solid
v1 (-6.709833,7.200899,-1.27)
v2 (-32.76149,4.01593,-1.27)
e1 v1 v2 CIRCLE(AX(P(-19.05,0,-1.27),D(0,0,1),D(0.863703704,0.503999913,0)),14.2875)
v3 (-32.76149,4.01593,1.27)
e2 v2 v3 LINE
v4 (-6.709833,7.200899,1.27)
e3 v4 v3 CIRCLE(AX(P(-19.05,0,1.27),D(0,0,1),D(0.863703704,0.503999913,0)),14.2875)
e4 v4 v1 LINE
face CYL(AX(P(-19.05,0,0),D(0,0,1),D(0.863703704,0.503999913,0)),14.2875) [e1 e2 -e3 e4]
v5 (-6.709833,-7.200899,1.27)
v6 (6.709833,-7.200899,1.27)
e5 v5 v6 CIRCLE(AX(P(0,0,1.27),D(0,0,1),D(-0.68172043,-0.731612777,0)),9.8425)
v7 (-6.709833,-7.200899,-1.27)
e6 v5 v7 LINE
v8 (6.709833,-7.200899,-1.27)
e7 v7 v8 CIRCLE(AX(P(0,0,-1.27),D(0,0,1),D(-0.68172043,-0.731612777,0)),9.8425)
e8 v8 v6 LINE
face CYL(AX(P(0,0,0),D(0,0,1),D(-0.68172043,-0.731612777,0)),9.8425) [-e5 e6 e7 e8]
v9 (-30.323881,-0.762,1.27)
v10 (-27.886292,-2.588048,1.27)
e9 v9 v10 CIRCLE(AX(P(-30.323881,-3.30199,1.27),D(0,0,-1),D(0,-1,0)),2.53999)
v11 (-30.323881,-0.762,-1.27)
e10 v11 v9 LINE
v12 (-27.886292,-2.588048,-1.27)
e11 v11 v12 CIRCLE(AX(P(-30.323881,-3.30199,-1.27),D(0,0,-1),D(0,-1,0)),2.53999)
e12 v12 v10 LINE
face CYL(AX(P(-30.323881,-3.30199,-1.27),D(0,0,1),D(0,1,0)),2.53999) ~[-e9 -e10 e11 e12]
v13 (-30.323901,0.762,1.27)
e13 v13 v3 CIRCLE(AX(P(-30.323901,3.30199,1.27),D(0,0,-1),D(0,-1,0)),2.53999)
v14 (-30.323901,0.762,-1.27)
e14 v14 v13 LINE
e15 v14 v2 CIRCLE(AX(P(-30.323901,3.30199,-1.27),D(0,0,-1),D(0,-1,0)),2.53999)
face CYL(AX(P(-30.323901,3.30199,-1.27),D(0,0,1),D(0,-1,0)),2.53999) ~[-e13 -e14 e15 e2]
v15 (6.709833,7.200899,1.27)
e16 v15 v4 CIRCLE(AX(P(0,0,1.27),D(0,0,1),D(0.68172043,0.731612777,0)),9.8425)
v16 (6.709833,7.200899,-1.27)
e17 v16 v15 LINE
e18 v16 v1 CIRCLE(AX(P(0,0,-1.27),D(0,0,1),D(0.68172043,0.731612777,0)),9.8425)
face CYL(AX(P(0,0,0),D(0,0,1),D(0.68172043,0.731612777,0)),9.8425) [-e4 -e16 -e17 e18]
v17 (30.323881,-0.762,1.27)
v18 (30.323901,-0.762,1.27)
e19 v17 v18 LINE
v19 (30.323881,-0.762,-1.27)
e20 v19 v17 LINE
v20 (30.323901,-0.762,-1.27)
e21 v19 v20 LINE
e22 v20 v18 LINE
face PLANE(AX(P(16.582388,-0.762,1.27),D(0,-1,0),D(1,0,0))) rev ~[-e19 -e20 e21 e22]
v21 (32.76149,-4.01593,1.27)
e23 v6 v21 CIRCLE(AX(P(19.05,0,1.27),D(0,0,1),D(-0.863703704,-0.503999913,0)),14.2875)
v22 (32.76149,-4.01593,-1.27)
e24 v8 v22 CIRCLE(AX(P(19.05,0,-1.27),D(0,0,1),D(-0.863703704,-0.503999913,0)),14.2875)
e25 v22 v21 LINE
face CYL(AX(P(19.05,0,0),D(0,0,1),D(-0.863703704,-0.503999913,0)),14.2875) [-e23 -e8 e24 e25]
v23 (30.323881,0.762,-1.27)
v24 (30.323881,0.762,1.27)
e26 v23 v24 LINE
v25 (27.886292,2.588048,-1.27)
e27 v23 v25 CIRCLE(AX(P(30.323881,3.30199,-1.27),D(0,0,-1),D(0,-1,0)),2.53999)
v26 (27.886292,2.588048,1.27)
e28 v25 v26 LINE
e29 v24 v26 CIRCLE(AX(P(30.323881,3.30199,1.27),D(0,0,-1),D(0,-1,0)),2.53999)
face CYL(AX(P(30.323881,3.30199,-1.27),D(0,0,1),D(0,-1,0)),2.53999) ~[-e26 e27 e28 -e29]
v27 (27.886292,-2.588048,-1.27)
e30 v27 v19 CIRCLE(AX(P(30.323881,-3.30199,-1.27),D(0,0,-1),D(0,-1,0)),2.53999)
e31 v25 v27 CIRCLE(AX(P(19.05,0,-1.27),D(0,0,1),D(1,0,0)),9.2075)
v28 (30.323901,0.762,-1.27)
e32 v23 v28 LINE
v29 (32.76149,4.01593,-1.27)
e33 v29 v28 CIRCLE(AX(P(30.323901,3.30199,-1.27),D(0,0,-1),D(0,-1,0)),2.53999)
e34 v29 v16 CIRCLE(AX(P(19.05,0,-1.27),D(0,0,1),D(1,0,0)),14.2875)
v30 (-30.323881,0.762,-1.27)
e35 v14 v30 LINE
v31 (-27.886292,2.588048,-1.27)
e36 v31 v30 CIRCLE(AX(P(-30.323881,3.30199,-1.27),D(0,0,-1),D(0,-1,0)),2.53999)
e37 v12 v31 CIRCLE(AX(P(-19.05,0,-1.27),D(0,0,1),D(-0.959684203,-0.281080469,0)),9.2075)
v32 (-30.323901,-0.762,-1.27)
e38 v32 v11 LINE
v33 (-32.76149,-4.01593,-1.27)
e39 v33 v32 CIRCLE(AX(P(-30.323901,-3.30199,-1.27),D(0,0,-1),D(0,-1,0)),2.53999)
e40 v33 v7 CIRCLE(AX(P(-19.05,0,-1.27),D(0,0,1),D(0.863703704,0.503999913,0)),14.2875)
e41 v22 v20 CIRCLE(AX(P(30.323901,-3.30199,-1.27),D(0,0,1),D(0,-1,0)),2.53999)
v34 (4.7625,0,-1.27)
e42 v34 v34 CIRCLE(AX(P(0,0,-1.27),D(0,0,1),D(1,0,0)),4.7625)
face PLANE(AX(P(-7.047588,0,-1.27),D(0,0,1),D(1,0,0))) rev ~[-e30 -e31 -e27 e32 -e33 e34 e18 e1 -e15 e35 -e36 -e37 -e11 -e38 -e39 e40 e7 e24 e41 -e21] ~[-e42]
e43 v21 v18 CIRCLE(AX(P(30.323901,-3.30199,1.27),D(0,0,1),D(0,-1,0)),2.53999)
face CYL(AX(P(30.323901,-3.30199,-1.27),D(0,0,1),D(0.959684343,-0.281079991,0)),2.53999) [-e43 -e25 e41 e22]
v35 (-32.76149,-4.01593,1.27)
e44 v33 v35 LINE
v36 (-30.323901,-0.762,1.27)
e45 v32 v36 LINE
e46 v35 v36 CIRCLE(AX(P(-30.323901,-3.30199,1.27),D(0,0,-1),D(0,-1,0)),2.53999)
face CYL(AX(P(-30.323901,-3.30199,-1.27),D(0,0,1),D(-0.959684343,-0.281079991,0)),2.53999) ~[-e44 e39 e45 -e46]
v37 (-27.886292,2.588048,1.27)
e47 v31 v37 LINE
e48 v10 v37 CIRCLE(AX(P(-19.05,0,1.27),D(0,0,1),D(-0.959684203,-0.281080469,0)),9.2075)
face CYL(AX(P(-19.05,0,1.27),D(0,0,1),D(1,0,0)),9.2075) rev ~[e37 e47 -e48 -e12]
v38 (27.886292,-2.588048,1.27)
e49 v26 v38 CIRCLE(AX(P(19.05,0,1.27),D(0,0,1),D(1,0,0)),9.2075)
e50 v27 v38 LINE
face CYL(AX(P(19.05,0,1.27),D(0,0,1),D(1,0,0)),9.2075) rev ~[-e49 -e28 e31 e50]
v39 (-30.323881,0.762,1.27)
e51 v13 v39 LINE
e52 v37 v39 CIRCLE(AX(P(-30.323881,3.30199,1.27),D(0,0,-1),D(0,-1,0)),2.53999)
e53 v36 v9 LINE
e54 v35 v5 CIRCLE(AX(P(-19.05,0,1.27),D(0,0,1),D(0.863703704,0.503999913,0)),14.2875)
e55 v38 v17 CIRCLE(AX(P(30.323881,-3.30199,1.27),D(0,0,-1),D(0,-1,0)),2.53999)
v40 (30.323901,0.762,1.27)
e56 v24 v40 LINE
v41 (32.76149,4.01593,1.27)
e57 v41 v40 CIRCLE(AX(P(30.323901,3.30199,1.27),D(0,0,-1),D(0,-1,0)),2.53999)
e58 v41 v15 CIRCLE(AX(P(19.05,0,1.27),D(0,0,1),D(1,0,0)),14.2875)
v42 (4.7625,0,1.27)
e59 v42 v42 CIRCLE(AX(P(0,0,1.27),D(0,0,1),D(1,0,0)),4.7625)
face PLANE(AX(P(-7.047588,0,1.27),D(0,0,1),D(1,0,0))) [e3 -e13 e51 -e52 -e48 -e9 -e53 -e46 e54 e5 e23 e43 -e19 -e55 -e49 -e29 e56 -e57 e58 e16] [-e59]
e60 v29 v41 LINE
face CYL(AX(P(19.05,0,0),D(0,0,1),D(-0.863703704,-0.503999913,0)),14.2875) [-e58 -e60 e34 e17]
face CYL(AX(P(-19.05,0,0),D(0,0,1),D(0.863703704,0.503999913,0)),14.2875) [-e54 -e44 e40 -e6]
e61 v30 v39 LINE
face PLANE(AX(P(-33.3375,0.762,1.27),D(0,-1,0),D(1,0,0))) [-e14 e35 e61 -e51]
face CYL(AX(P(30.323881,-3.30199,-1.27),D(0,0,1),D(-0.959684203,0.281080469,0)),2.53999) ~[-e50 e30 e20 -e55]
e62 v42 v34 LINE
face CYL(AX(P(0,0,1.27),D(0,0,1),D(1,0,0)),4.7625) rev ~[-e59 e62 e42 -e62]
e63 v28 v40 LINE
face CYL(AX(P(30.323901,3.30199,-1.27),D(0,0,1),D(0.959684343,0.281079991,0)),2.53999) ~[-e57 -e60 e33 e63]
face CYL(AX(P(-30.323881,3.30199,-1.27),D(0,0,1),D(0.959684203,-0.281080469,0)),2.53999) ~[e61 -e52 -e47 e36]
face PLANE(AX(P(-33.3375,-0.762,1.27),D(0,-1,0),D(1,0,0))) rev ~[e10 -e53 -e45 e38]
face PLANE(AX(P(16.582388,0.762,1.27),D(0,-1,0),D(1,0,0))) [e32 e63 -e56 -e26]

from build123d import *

# Parameters (mm, degrees)
F1_DEPTH = 1.27
F2_R     = 9.2075
F2_R_2   = 4.7625
F3_DEPTH = 25.4
F4_W     = 16.7551115155
F4_H     = 1.524
F5_DEPTH = 25.4
F6_R     = 2.53999


# Not quite as in the source:
# - a fillet or chamfer is up to 0.001 mm smaller than in the source, because OpenCascade refuses the exact size


with BuildPart() as f1:
    # F0 (on Top) → F1 (new body, symmetric)
    with BuildSketch(Plane.XY):
        with BuildLine():
            ThreePointArc((-6.7098333333, -7.2008987556), (-5.2579227906, -3.7297804895), (-4.7625, 0))
            ThreePointArc((-4.7625, 0), (-5.2579227906, 3.7297804895), (-6.7098333333, 7.2008987556))
            ThreePointArc((-6.7098333333, 7.2008987556), (-9.8425, 0), (-6.7098333333, -7.2008987556))
        make_face()
        with BuildLine():
            ThreePointArc((-6.7098333333, 7.2008987556), (-5.2579227906, 3.7297804895), (-4.7625, 0))
            ThreePointArc((-4.7625, 0), (-5.2579227906, -3.7297804895), (-6.7098333333, -7.2008987556))
            ThreePointArc((-6.7098333333, -7.2008987556), (0, -9.8425), (6.7098333333, -7.2008987556))
            ThreePointArc((6.7098333333, -7.2008987556), (4.7625, 0), (6.7098333333, 7.2008987556))
            ThreePointArc((6.7098333333, 7.2008987556), (0, 9.8425), (-6.7098333333, 7.2008987556))
        make_face()
        with BuildLine():
            ThreePointArc((-6.7098333333, -7.2008987556), (-9.8425, 0), (-6.7098333333, 7.2008987556))
            ThreePointArc((-6.7098333333, 7.2008987556), (-33.3375, 0), (-6.7098333333, -7.2008987556))
        make_face()
        with BuildLine():
            ThreePointArc((9.8425, 0), (9.0254180189, 3.9264024034), (6.7098333333, 7.2008987556))
            ThreePointArc((6.7098333333, 7.2008987556), (4.7625, 0), (6.7098333333, -7.2008987556))
            ThreePointArc((6.7098333333, -7.2008987556), (9.0254180189, -3.9264024034), (9.8425, 0))
        make_face()
        with BuildLine():
            ThreePointArc((33.3375, 0), (22.7797804895, 13.7920772094), (6.7098333333, 7.2008987556))
            ThreePointArc((6.7098333333, 7.2008987556), (9.0254180189, 3.9264024034), (9.8425, 0))
            ThreePointArc((9.8425, 0), (9.0254180189, -3.9264024034), (6.7098333333, -7.2008987556))
            ThreePointArc((6.7098333333, -7.2008987556), (22.7797804895, -13.7920772094), (33.3375, 0))
        make_face()
    extrude(amount=F1_DEPTH, both=True)

    # F2 (on face) → F3 (cut)
    with BuildSketch(Plane.XY.offset(1.27)):
        with Locations((-19.05, 0)):
            Circle(F2_R)
        with Locations((19.05, 0)):
            Circle(F2_R)
        Circle(F2_R_2)
    extrude(amount=-F3_DEPTH, mode=Mode.SUBTRACT)

    # F4 (on face) → F5 (cut)
    with BuildSketch(Plane.XY.offset(1.27)):
        with Locations((-24.9599442422, 0)):
            Rectangle(F4_W, F4_H)
        with Locations((24.9599442422, 0)):
            Rectangle(F4_W, F4_H)
    extrude(amount=-F5_DEPTH, mode=Mode.SUBTRACT)

    # F6 (radius 2.54 in the source; OpenCascade refuses exactly that, so slightly less here)
    f6_edges = [f1.edges().sort_by_distance(p)[0] for p in [
        (-33.317166, 0.762, 0),
        (-28.225915, 0.762, 0),
        (-28.225915, -0.762, 0),
        (-33.317166, -0.762, 0),
        (28.225915, -0.762, 0),
        (28.225915, 0.762, 0),
        (33.317166, 0.762, 0),
        (33.317166, -0.762, 0),
    ]]
    fillet(f6_edges, radius=F6_R)


solid = f1.part
